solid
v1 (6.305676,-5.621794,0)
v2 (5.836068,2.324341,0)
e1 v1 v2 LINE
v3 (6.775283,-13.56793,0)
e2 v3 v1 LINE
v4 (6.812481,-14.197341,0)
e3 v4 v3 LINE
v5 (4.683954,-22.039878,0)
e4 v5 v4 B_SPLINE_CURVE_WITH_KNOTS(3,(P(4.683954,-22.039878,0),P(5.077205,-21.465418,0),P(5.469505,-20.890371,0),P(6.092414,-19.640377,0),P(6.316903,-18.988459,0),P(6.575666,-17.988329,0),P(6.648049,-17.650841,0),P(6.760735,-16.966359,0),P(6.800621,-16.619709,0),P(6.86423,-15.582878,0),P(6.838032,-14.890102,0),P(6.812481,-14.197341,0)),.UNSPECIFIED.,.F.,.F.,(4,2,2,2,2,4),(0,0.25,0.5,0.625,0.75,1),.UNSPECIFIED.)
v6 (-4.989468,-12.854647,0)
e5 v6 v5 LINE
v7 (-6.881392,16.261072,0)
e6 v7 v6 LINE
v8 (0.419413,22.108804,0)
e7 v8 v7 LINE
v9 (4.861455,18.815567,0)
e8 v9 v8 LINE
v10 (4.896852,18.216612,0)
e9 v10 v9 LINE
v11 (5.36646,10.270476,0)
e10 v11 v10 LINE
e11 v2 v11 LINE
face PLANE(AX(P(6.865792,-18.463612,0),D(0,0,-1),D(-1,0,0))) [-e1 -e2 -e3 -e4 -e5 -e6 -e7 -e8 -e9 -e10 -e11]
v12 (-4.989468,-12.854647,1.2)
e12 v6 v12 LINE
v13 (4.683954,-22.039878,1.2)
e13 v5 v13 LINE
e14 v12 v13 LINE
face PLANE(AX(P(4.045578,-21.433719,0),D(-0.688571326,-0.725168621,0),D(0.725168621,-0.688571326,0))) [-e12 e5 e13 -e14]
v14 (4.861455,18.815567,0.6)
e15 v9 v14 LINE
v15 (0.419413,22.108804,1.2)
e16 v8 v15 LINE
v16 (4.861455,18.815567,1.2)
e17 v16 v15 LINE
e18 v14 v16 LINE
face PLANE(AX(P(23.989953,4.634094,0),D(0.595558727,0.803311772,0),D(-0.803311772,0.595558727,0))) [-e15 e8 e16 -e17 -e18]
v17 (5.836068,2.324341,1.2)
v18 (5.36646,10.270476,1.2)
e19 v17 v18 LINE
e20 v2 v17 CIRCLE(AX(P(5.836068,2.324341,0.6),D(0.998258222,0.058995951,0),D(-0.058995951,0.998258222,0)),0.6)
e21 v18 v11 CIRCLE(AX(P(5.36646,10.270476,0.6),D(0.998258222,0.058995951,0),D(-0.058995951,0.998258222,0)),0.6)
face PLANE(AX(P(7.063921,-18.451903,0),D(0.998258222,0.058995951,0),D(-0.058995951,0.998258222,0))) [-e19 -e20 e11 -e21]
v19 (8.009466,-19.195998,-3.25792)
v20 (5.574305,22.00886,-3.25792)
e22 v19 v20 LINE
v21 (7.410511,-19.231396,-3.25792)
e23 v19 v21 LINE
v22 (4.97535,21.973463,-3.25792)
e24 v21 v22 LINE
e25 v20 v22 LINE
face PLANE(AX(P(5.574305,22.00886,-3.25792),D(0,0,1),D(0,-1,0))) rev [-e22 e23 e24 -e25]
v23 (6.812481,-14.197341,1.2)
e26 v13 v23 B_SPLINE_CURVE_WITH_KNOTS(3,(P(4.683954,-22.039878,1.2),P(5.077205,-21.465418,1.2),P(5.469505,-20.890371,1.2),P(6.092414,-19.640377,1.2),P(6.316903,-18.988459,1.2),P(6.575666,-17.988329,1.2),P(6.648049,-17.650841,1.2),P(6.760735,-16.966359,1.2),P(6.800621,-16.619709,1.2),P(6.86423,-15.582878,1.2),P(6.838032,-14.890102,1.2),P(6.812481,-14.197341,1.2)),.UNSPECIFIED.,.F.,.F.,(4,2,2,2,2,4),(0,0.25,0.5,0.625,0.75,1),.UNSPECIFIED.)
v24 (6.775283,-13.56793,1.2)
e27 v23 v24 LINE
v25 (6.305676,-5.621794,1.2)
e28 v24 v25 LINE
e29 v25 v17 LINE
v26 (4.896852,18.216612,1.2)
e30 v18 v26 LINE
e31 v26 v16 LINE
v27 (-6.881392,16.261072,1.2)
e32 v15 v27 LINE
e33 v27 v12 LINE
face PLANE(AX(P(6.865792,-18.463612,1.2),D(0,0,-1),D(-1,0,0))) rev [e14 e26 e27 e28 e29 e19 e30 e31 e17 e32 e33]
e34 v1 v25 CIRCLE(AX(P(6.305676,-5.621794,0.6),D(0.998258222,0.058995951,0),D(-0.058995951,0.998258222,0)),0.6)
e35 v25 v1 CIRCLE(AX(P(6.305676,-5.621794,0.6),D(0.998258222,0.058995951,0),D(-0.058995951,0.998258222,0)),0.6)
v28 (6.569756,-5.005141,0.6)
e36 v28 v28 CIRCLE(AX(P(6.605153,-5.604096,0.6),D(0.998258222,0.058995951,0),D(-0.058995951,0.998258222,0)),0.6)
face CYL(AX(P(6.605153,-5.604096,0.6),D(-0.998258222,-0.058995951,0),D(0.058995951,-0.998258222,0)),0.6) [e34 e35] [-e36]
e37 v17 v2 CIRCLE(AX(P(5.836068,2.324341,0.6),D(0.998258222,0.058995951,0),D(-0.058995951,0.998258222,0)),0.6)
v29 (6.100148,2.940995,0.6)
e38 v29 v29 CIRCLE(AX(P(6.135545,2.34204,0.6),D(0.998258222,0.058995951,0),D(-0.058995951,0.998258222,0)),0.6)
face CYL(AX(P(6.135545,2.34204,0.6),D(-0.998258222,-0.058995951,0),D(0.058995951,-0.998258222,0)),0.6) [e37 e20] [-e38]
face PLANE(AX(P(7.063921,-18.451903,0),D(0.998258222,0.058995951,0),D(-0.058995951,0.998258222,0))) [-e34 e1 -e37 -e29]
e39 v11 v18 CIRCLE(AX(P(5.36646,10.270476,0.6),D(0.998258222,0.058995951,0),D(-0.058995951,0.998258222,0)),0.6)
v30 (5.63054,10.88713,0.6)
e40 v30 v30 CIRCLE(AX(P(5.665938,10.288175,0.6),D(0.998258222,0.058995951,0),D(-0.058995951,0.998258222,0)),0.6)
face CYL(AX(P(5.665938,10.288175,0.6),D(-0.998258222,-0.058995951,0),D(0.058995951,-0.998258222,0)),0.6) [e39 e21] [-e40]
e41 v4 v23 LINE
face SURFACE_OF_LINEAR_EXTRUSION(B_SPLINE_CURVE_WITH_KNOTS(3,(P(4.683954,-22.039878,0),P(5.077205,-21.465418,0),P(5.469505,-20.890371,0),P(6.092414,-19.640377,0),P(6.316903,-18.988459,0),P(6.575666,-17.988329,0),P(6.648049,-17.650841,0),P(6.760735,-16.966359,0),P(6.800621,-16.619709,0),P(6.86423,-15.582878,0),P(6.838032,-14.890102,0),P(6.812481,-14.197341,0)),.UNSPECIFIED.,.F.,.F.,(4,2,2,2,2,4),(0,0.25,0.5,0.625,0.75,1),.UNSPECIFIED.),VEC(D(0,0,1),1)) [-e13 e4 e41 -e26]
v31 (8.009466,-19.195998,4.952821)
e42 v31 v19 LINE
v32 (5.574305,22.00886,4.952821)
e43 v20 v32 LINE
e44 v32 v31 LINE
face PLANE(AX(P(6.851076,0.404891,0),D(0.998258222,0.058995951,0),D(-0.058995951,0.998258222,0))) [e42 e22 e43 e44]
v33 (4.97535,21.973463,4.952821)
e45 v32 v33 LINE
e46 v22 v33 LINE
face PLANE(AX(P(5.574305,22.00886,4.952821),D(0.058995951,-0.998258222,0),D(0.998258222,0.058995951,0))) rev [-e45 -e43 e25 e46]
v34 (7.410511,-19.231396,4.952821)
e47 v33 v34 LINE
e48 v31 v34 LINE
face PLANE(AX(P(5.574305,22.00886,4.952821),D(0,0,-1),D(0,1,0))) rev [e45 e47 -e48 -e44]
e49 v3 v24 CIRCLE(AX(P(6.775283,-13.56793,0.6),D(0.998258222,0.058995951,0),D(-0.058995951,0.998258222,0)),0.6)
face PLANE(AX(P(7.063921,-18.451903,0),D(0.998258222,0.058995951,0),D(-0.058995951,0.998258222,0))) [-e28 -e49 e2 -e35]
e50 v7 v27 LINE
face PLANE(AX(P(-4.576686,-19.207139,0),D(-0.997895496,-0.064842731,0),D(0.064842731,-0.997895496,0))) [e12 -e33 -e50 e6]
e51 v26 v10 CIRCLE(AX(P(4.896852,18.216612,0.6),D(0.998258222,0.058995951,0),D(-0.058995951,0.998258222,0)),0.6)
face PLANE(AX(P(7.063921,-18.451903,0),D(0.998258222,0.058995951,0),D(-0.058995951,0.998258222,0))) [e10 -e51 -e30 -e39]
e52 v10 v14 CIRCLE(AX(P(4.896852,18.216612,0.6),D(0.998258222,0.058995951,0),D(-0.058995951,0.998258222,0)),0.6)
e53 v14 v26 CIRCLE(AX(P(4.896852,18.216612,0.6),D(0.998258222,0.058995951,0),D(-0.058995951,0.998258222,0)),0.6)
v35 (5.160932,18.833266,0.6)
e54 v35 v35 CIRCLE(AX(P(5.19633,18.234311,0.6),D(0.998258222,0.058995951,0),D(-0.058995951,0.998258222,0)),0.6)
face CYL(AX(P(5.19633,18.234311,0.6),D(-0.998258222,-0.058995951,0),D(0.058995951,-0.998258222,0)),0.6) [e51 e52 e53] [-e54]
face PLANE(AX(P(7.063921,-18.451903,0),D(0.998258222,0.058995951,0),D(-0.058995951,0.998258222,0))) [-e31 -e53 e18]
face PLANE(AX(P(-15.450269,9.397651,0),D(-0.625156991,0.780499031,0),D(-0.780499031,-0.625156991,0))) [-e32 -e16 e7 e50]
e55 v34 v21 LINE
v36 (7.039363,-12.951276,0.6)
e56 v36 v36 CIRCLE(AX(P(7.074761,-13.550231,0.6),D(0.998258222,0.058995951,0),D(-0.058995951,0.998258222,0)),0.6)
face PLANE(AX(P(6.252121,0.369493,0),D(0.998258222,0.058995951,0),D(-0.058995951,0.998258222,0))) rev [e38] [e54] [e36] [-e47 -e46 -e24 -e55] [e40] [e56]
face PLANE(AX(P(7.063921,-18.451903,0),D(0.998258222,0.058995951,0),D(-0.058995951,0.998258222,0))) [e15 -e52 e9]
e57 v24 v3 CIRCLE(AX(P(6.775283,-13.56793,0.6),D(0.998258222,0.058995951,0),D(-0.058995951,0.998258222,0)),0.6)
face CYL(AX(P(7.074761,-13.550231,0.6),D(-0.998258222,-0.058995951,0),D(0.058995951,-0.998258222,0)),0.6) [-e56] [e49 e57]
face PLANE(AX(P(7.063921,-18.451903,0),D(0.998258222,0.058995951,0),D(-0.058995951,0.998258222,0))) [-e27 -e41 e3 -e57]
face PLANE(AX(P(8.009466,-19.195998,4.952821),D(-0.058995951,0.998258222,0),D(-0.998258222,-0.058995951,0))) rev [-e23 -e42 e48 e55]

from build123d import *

# Parameters (mm, degrees)
EXTRUDE_1_DEPTH     = 1.2
CUT_EXTRUDE_START   = -1.2
CUT_EXTRUDE_1_DEPTH = 1.2
SKETCH_3_R          = 0.6
EXTRUDE_2_DEPTH     = 0.3
SKETCH_4_W          = 8.210741719
SKETCH_4_H          = 41.276753536
EXTRUDE_3_DEPTH     = 0.6


# Read off the part's stored shape, not the designer's step: Вырез-Вытянуть-Тонкостенный1
with BuildPart() as part:
    # Эскиз1 → Бобышка-Вытянуть1 (new body)
    with BuildSketch(Plane.XY):
        with BuildLine():
            Line((5.249737614, 19.025640721), (0.409977198, 22.613738961))
            Line((0.409977198, 22.613738961), (-7.294059401, 16.443030035))
            Line((-7.294059401, 16.443030035), (-5.378470688, -13.036872049))
            Line((-5.378470688, -13.036872049), (4.707402929, -22.613738961))
            Line((4.707402929, -22.613738961), (4.977734505, -22.318831787))
            add(Edge.make_bspline(
                [(4.977734505, -22.318831787), (5.380257217, -21.730973812), (6.179089351, -20.564331963), (6.904763741, -18.546948907), (7.294059401, -16.401738794), (7.239811, -14.930944587), (7.212045754, -14.178167322)],
                knots=[0, 0, 0, 0, 0.246766883, 0.489724704, 0.738832503, 1, 1, 1, 1], degree=3))
            Line((7.212045754, -14.178167322), (5.249737614, 19.025640721))
        make_face()
    extrude(amount=EXTRUDE_1_DEPTH)

    # Вырез-Вытянуть-Тонкостенный1 outline → Вырез-Вытянуть-Тонкостенный1 (cut)
    with BuildSketch(Plane.XY.offset(1.2).offset(CUT_EXTRUDE_START)):
        with BuildLine():
            Line((4.707402929, -22.613738961), (4.977734505, -22.318831787))
            add(Edge.make_bspline(
                [(4.977734505, -22.318831787), (5.380257217, -21.730973812), (6.179089351, -20.564331963), (6.904763741, -18.546948907), (7.294059401, -16.401738794), (7.239811, -14.930944587), (7.212045754, -14.178167322)],
                knots=[0, 0, 0, 0, 0.246766883, 0.489724704, 0.738832503, 1, 1, 1, 1], degree=3))
            Line((7.212045754, -14.178167322), (5.249737614, 19.025640721))
            Line((5.249737614, 19.025640721), (0.409977198, 22.613738961))
            Line((0.409977198, 22.613738961), (-7.294059401, 16.443030035))
            Line((-7.294059401, 16.443030035), (-5.378470688, -13.036872049))
            Line((-5.378470688, -13.036872049), (4.707402929, -22.613738961))
        make_face()
        with BuildLine():
            add(Edge.make_bspline(
                [(4.683954221, -22.039877798), (5.077205265, -21.465418253), (5.469505076, -20.890370995), (6.092414375, -19.640377114), (6.316902906, -18.988458608), (6.575666444, -17.98832874), (6.648049215, -17.650841196), (6.760734776, -16.966359137), (6.800621162, -16.619708847), (6.864229804, -15.582878491), (6.838032295, -14.890102205), (6.812480945, -14.197340575)],
                knots=[0, 0, 0, 0, 0.25, 0.25, 0.5, 0.5, 0.625, 0.625, 0.75, 0.75, 1, 1, 1, 1], degree=3))
            Line((4.683954221, -22.039877798), (-4.989468001, -12.854646977))
            Line((-4.989468001, -12.854646977), (-6.881392269, 16.261071759))
            Line((-6.881392269, 16.261071759), (0.419413416, 22.108804468))
            Line((0.419413416, 22.108804468), (4.861454817, 18.815566877))
            Line((4.861454817, 18.815566877), (6.812480945, -14.197340575))
        make_face(mode=Mode.SUBTRACT)
    extrude(amount=CUT_EXTRUDE_1_DEPTH, mode=Mode.SUBTRACT)

    # Эскиз3 → Бобышка-Вытянуть2 (add)
    with BuildSketch(Plane(origin=(5.952643232, 0.351794597, 0), x_dir=(0, 0, -1), z_dir=(0.9982582219819068, 0.05899595109430813, 0))):
        with Locations(Location((-0.6, 17.895988185, 0), (0, 0, 90))):
            Circle(SKETCH_3_R)
        with Locations((-0.6, 9.935988185)):
            Circle(SKETCH_3_R)
        with Locations((-0.6, 1.975988185)):
            Circle(SKETCH_3_R)
        with Locations((-0.6, -5.984011815)):
            Circle(SKETCH_3_R)
        with Locations((-0.6, -13.944011815)):
            Circle(SKETCH_3_R)
    extrude(amount=EXTRUDE_2_DEPTH)

    # Эскиз4 → Бобышка-Вытянуть3 (add)
    with BuildSketch(Plane(origin=(6.252120699, 0.369493382, 0), x_dir=(0, 0, -1), z_dir=(0.9982582219819068, 0.05899595109430812, 0))):
        with Locations((-0.847450423, 1.003287523)):
            Rectangle(SKETCH_4_W, SKETCH_4_H)
    extrude(amount=EXTRUDE_3_DEPTH)


solid = part.part
